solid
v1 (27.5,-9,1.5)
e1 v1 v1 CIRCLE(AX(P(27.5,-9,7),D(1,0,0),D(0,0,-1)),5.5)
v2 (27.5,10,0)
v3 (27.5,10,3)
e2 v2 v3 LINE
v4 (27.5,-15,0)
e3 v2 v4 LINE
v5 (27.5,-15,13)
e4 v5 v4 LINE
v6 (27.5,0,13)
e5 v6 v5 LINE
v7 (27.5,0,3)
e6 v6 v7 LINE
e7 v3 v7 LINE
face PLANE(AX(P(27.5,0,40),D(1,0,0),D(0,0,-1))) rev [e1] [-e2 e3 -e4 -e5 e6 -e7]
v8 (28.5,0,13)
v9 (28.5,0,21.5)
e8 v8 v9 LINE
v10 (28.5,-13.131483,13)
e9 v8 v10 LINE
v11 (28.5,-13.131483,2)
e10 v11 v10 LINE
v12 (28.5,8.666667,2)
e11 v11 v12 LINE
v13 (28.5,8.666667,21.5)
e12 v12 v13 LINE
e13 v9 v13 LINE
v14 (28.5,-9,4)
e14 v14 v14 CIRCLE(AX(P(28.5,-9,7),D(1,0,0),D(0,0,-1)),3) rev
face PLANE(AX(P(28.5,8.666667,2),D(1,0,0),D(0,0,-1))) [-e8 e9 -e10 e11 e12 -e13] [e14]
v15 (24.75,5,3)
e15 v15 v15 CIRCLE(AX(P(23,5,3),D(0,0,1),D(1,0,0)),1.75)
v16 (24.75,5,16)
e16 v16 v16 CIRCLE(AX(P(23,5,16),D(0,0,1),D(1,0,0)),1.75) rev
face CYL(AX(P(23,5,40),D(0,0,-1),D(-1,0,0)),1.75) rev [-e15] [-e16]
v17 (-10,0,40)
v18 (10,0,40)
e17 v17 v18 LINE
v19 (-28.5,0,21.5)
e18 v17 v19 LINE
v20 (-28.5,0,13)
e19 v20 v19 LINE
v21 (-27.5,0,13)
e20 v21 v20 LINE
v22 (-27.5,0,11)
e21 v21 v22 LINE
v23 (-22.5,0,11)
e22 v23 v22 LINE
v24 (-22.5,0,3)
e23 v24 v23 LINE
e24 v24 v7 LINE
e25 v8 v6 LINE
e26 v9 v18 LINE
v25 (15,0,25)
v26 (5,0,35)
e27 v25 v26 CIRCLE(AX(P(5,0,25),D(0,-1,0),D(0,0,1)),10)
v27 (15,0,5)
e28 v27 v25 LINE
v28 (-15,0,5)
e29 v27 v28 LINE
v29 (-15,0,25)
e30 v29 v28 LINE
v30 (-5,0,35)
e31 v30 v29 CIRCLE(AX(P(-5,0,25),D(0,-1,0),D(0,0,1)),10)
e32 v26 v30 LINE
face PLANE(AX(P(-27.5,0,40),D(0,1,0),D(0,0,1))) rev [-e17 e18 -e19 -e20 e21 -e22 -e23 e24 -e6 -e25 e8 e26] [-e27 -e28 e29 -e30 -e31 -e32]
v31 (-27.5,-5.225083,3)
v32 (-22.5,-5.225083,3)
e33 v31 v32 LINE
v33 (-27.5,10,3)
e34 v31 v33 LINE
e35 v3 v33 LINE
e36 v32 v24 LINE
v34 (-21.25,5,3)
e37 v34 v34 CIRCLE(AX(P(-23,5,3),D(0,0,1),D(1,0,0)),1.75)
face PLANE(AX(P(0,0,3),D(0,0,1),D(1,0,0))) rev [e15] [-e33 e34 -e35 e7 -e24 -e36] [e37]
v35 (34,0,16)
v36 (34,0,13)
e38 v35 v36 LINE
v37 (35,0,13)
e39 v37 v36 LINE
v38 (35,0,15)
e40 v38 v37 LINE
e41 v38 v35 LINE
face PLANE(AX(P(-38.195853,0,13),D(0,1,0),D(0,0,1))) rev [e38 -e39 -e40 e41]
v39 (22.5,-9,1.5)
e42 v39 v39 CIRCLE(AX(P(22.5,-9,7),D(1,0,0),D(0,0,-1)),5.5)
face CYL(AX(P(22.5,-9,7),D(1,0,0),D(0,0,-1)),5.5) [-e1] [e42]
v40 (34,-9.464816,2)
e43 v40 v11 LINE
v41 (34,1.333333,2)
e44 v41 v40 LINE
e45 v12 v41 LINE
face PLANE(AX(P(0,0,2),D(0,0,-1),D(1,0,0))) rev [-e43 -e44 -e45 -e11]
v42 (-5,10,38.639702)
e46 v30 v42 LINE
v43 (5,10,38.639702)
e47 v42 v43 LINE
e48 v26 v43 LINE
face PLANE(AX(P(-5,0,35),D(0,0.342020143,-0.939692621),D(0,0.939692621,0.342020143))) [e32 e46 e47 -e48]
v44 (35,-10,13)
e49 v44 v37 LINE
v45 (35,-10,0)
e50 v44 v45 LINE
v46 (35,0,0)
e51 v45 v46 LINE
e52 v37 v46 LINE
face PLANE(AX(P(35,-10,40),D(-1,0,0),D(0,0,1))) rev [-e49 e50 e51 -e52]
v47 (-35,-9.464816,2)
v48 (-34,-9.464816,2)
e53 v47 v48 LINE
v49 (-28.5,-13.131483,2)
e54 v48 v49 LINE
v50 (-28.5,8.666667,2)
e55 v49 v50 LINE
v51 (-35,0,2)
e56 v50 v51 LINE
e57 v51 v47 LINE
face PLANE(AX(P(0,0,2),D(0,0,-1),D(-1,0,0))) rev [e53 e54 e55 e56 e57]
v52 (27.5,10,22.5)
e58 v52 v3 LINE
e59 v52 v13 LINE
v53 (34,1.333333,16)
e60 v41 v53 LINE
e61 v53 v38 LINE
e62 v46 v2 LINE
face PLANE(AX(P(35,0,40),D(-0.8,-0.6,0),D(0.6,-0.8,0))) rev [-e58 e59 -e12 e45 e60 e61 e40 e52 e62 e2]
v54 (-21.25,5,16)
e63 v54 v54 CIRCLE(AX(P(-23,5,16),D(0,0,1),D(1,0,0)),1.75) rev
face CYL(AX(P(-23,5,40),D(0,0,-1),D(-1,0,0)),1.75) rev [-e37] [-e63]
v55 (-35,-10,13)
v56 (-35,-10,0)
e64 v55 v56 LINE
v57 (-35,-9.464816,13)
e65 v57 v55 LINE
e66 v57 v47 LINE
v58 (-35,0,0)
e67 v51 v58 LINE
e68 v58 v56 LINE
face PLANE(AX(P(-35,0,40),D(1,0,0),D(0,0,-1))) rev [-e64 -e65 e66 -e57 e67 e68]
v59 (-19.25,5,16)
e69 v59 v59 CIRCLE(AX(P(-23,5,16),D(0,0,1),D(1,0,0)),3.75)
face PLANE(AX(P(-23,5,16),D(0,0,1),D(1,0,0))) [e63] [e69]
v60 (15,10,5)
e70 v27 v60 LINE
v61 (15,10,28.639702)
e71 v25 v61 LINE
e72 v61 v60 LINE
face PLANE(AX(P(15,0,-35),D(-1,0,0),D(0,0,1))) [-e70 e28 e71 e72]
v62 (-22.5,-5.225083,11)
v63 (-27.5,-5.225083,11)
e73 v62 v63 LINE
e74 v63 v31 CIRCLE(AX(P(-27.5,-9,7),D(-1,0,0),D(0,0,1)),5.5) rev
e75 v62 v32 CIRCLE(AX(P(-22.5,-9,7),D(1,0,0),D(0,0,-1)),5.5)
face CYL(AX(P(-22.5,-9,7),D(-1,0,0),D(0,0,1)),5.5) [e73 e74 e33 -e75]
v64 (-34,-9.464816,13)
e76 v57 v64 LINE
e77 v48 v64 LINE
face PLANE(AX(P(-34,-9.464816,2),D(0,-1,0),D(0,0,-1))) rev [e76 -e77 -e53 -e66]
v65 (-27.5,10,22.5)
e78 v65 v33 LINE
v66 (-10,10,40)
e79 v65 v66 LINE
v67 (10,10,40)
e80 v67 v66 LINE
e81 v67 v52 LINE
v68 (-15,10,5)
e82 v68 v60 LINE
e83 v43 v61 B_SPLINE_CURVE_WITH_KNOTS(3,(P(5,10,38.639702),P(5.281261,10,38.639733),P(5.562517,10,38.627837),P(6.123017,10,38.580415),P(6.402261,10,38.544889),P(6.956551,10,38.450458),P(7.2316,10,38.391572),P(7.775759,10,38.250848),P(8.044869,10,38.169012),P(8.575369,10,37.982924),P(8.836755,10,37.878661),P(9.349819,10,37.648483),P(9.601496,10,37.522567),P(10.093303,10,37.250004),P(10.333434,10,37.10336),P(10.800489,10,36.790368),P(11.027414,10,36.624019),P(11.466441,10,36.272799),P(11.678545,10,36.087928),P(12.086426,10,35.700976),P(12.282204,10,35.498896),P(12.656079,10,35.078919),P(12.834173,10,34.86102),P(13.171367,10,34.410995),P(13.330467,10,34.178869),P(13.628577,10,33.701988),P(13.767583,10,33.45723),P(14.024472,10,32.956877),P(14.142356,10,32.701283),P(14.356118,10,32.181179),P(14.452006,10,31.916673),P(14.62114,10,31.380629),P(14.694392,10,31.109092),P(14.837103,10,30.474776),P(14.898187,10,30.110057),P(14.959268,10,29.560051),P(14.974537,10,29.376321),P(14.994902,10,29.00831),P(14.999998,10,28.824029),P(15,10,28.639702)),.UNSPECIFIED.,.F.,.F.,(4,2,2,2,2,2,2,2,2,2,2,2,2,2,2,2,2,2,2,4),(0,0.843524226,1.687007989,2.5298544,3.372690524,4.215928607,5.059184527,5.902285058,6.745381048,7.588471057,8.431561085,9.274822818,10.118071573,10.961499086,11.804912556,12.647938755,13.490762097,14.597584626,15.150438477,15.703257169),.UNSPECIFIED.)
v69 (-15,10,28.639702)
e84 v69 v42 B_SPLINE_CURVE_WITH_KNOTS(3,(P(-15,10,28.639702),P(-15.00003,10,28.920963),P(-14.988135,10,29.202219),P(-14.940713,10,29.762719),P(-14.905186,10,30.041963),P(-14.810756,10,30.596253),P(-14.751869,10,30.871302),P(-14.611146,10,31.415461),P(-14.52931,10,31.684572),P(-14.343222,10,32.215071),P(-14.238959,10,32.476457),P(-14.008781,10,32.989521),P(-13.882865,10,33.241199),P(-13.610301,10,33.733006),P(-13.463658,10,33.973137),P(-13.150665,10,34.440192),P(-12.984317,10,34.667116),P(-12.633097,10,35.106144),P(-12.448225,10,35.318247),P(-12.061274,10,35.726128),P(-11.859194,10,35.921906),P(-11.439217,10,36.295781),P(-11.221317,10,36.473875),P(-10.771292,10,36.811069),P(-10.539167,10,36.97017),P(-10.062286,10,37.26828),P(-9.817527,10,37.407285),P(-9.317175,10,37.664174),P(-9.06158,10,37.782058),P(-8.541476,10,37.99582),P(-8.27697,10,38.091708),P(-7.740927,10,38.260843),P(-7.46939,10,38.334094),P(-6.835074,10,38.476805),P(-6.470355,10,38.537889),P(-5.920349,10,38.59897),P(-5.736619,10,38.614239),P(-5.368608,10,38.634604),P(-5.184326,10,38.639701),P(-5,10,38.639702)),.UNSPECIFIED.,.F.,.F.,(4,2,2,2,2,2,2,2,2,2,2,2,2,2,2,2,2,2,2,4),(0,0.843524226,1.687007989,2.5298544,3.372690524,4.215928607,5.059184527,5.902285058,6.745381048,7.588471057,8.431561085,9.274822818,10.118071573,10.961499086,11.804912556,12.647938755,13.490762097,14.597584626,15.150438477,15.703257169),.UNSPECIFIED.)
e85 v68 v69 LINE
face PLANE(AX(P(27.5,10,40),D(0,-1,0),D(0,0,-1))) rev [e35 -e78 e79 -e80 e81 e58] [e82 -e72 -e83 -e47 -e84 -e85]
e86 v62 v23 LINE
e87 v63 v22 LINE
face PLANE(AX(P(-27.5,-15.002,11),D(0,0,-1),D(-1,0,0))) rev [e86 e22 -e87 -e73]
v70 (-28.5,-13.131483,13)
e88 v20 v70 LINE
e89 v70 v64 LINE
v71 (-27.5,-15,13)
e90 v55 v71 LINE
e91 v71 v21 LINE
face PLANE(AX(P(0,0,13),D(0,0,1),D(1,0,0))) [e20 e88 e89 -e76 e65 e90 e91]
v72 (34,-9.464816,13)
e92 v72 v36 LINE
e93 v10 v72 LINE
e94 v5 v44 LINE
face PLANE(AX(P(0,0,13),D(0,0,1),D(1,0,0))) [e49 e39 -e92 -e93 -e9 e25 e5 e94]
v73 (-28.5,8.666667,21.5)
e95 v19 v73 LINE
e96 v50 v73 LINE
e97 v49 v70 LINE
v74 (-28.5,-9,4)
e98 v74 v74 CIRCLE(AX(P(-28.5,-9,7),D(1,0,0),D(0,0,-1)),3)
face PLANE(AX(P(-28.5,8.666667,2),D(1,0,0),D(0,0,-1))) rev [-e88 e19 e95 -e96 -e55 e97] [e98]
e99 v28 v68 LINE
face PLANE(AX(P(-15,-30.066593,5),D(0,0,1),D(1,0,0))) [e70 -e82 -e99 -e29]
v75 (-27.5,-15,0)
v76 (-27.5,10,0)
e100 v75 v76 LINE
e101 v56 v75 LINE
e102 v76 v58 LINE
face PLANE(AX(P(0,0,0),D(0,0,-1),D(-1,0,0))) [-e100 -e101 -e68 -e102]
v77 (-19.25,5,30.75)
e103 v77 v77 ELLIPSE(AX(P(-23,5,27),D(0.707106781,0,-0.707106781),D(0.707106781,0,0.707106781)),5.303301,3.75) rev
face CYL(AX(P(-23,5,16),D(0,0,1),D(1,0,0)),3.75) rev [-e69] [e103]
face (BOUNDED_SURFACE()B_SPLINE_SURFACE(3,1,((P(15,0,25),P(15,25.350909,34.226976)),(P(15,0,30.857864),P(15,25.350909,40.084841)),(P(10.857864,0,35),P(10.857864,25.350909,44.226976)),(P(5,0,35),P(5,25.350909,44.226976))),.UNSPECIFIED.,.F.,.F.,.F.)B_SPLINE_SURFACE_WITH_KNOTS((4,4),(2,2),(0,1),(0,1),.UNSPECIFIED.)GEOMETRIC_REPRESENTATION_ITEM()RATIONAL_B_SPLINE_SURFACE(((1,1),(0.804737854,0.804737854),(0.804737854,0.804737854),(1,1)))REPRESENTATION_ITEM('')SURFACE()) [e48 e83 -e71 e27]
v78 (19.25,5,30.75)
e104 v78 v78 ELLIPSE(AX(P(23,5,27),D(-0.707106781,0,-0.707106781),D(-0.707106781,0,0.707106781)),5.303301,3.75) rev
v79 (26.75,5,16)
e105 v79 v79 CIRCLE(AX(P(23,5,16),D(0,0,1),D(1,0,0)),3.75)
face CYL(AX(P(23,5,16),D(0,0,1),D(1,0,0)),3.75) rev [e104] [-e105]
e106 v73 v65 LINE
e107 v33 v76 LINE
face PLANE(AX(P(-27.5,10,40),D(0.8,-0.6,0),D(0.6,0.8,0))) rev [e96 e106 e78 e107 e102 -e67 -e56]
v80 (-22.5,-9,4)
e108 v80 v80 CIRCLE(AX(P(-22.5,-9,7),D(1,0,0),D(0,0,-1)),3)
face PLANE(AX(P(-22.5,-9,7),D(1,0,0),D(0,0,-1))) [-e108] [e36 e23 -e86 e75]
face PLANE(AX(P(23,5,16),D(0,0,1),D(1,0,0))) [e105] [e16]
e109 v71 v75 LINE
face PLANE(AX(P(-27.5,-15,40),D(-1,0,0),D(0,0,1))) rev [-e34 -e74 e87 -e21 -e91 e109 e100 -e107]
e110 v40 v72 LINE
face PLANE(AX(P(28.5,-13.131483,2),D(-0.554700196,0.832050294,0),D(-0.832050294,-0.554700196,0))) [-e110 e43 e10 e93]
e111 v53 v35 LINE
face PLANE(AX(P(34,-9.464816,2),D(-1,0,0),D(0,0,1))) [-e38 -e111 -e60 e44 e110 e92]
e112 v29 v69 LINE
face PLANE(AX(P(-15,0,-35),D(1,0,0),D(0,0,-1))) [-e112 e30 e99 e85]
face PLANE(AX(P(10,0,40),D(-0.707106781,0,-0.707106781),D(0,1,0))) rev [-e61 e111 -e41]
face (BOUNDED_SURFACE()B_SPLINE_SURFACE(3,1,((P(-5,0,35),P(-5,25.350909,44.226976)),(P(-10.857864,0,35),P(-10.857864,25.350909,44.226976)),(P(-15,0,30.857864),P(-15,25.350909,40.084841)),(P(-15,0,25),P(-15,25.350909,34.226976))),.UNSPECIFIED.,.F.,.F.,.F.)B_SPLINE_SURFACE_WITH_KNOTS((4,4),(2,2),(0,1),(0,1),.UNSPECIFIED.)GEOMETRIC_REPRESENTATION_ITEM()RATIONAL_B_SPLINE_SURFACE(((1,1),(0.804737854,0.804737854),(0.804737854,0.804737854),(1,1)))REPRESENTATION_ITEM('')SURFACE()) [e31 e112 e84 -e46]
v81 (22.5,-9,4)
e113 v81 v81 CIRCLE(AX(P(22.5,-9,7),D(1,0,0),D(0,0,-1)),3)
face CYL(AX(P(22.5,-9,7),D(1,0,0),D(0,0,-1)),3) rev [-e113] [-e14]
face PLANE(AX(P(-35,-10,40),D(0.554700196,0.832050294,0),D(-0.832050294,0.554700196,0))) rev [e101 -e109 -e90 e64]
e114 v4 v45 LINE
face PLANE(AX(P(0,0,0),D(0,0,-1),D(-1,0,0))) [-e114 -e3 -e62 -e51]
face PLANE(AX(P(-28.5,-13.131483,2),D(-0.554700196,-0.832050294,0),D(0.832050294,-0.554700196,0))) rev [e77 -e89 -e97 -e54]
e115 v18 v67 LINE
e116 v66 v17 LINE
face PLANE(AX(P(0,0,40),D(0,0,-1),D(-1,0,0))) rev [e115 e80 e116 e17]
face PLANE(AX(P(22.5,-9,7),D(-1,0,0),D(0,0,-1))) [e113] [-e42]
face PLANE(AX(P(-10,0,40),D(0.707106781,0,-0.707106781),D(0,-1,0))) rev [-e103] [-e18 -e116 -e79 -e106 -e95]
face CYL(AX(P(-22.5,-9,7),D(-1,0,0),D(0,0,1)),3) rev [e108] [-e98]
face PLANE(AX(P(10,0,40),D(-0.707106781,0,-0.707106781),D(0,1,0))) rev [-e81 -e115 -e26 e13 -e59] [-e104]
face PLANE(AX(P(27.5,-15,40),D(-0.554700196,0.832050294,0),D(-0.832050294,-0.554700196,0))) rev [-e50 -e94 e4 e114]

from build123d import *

# Parameters (mm, degrees)
BOSS_EXTRUDE1_DEPTH      = 40
CHAMFER1_SIZE            = 25
SKETCH3_W                = 55
SKETCH3_H                = 30.849850196
CUT_EXTRUDE2_DEPTH       = 3
SKETCH5_R                = 1.75
CUT_EXTRUDE4_DEPTH       = 56.226805086
CUT_EXTRUDE3_DEPTH       = 38
SKETCH6_R                = 5.5
SKETCH6_R_2              = 3
BOSS_EXTRUDE2_DEPTH      = 5
CUT_EXTRUDE5_START       = -2
SKETCH7_R                = 3
CUT_EXTRUDE5_DEPTH       = 2
SKETCH9_R                = 3.75
CUT_EXTRUDE7_DEPTH       = 24
SKETCH10_W               = 80.05733418
SKETCH10_H               = 23.210803027
CUT_EXTRUDE8_DEPTH       = 27
BOSS_EXTRUDE3_REACH      = 57.227
BOSS_EXTRUDE3_END_RADIUS = 5.5
SKETCH13_W               = 5
SKETCH13_H               = 8
SKETCH14_W               = 8.301356979
SKETCH14_H               = 17.411858477
CUT_EXTRUDE9_DEPTH       = 38
SKETCH15_W               = 30
SKETCH15_H               = 2
BOSS_EXTRUDE4_DEPTH      = 10


with BuildPart() as part:
    # Sketch1 → Boss-Extrude1 (new body)
    with BuildSketch(Plane.XY):
        Polygon((-27.5, 0), (27.5, 0), (27.5, -15), (35, -10), (35, 0), (27.5, 10), (-27.5, 10), (-35, 0), (-35, -10), (-27.5, -15), align=None)
    extrude(amount=BOSS_EXTRUDE1_DEPTH)

    # Chamfer1
    # the kernel refuses this chamfer: 25 mm, written as the material it takes off along each edge
    with BuildSketch(Plane(origin=(35, -74.292074699, 40), x_dir=(0.027495876610586317, 0, -0.9996219169112966), z_dir=(0, 1, 0)), Plane(origin=(-35, 64.292074699, 40), x_dir=(-0.027495876610586317, 0, -0.9996219169112966), z_dir=(0, -1, 0))) as chamfer1_piece_1:
        Polygon((CHAMFER1_SIZE * 0.999621916911, CHAMFER1_SIZE * 0.0274958766106), (-CHAMFER1_SIZE * 0.0274958766106, CHAMFER1_SIZE * 0.999621916911), (0, 0), align=None)
    extrude(amount=138.584149398, mode=Mode.SUBTRACT)

    # Sketch3 → Cut-Extrude2 (cut)
    with BuildSketch(Plane(origin=(0, 0, 0), x_dir=(-1, 0, 0), z_dir=(0, 0, -1))):
        Rectangle(SKETCH3_W, SKETCH3_H)
    extrude(amount=-CUT_EXTRUDE2_DEPTH, mode=Mode.SUBTRACT)

    # Sketch5 → Cut-Extrude4 (cut, through all)
    with BuildSketch(Plane(origin=(0, 0, 0), x_dir=(-1, 0, 0), z_dir=(0, 0, -1))):
        with Locations(Location((-23, 5, 0), (0, 0, 180))):
            Circle(SKETCH5_R)
        with Locations((23, 5)):
            Circle(SKETCH5_R)
    extrude(amount=-CUT_EXTRUDE4_DEPTH, mode=Mode.SUBTRACT)

    # Sketch4 → Cut-Extrude3 (cut)
    with BuildSketch(Plane.XY.offset(40)):
        Polygon((-34, 1.333333333), (-28.5, 8.666666667), (-28.5, -13.131482908), (-34, -9.464816242), align=None)
    cut_extrude3 = extrude(amount=-CUT_EXTRUDE3_DEPTH, mode=Mode.SUBTRACT)

    # Sketch6 → Boss-Extrude2 (add)
    with BuildSketch(Plane(origin=(-27.5, 0, 0), x_dir=(0, 0, -1), z_dir=(1, 0, 0))):
        with Locations(Location((-7, -9, 0), (0, 0, 180))):
            Circle(SKETCH6_R)
        with Locations((-7, -9)):
            Circle(SKETCH6_R_2, mode=Mode.SUBTRACT)
    boss_extrude2 = extrude(amount=BOSS_EXTRUDE2_DEPTH)

    # Sketch7 → Cut-Extrude5 (cut)
    with BuildSketch(Plane(origin=(-27.5, 0, 0), x_dir=(0, 0, -1), z_dir=(1, 0, 0)).offset(CUT_EXTRUDE5_START)):
        with Locations((-7, -9)):
            Circle(SKETCH7_R)
    cut_extrude5 = extrude(amount=CUT_EXTRUDE5_DEPTH, mode=Mode.SUBTRACT)

    # Mirror1: Cut-Extrude3, Boss-Extrude2, Cut-Extrude5 across plane
    add(cut_extrude3.mirror(Plane(origin=(0, 0, 0), x_dir=(0, 0, 1), z_dir=(1, 0, 0))), mode=Mode.SUBTRACT)
    add(boss_extrude2.mirror(Plane(origin=(0, 0, 0), x_dir=(0, 0, 1), z_dir=(1, 0, 0))))
    add(cut_extrude5.mirror(Plane(origin=(0, 0, 0), x_dir=(0, 0, 1), z_dir=(1, 0, 0))), mode=Mode.SUBTRACT)

    # Sketch9 → Cut-Extrude7 (cut)
    with BuildSketch(Plane.XY.offset(40)):
        with Locations((-23, 5)):
            Circle(SKETCH9_R)
        with Locations((23, 5)):
            Circle(SKETCH9_R)
    extrude(amount=-CUT_EXTRUDE7_DEPTH, mode=Mode.SUBTRACT)

    # Sketch10 → Cut-Extrude8 (cut)
    with BuildSketch(Plane.XY.offset(40)):
        with Locations((1.832814427, -11.605401514)):
            Rectangle(SKETCH10_W, SKETCH10_H)
    extrude(amount=-CUT_EXTRUDE8_DEPTH, mode=Mode.SUBTRACT)

    # Cut-Sweep1: sweep along a path in Sketch11
    with BuildLine(Plane(origin=(0, 0, 0), x_dir=(0, 0, -1), z_dir=(1, 0, 0))) as cut_sweep1_path:
        Line((0, 0), (-9.226976352, 25.350909176))
    # Sketch2 → Cut-Sweep1 (sweep, cut)
    with BuildSketch(Plane.XZ):
        with BuildLine():
            Line((-15, -35), (15, -35))
            Line((15, -35), (15, 25))
            ThreePointArc((15, 25), (12.071067812, 32.071067812), (5, 35))
            Line((5, 35), (-5, 35))
            ThreePointArc((-5, 35), (-12.071067812, 32.071067812), (-15, 25))
            Line((-15, 25), (-15, -35))
        make_face()
    sweep(path=cut_sweep1_path.line, mode=Mode.SUBTRACT)

    # Boss-Extrude3: up to this cylinder (the profile starts outside it)
    boss_extrude3_end = Plane(origin=(-25, -9, 7), z_dir=(-1, 0, 0)) * Cylinder(BOSS_EXTRUDE3_END_RADIUS, 126.454, mode=Mode.PRIVATE)
    # Sketch13 → Boss-Extrude3 (add, up to the surface)
    with BuildSketch(Plane.XZ, mode=Mode.PRIVATE) as boss_extrude3_sk1:
        with Locations((-25, 7)):
            Rectangle(SKETCH13_W, SKETCH13_H)
    boss_extrude3_tool1 = extrude(boss_extrude3_sk1.sketch, amount=BOSS_EXTRUDE3_REACH, mode=Mode.PRIVATE) - boss_extrude3_end
    add(boss_extrude3_tool1.solids().sort_by_distance((-25, 0, 7))[0])

    # Sketch14 → Cut-Extrude9 (cut)
    with BuildSketch(Plane.XY.offset(40)):
        with Locations((-38.15067849, -0.758887004)):
            Rectangle(SKETCH14_W, SKETCH14_H)
    extrude(amount=-CUT_EXTRUDE9_DEPTH, mode=Mode.SUBTRACT)

    # Sketch15 → Boss-Extrude4 (add)
    with BuildSketch(Plane(origin=(0, 10, 0), x_dir=(1, 0, 0), z_dir=(0, 1, 0))):
        with Locations((0, -4)):
            Rectangle(SKETCH15_W, SKETCH15_H)
    extrude(amount=-BOSS_EXTRUDE4_DEPTH)


solid = part.part
